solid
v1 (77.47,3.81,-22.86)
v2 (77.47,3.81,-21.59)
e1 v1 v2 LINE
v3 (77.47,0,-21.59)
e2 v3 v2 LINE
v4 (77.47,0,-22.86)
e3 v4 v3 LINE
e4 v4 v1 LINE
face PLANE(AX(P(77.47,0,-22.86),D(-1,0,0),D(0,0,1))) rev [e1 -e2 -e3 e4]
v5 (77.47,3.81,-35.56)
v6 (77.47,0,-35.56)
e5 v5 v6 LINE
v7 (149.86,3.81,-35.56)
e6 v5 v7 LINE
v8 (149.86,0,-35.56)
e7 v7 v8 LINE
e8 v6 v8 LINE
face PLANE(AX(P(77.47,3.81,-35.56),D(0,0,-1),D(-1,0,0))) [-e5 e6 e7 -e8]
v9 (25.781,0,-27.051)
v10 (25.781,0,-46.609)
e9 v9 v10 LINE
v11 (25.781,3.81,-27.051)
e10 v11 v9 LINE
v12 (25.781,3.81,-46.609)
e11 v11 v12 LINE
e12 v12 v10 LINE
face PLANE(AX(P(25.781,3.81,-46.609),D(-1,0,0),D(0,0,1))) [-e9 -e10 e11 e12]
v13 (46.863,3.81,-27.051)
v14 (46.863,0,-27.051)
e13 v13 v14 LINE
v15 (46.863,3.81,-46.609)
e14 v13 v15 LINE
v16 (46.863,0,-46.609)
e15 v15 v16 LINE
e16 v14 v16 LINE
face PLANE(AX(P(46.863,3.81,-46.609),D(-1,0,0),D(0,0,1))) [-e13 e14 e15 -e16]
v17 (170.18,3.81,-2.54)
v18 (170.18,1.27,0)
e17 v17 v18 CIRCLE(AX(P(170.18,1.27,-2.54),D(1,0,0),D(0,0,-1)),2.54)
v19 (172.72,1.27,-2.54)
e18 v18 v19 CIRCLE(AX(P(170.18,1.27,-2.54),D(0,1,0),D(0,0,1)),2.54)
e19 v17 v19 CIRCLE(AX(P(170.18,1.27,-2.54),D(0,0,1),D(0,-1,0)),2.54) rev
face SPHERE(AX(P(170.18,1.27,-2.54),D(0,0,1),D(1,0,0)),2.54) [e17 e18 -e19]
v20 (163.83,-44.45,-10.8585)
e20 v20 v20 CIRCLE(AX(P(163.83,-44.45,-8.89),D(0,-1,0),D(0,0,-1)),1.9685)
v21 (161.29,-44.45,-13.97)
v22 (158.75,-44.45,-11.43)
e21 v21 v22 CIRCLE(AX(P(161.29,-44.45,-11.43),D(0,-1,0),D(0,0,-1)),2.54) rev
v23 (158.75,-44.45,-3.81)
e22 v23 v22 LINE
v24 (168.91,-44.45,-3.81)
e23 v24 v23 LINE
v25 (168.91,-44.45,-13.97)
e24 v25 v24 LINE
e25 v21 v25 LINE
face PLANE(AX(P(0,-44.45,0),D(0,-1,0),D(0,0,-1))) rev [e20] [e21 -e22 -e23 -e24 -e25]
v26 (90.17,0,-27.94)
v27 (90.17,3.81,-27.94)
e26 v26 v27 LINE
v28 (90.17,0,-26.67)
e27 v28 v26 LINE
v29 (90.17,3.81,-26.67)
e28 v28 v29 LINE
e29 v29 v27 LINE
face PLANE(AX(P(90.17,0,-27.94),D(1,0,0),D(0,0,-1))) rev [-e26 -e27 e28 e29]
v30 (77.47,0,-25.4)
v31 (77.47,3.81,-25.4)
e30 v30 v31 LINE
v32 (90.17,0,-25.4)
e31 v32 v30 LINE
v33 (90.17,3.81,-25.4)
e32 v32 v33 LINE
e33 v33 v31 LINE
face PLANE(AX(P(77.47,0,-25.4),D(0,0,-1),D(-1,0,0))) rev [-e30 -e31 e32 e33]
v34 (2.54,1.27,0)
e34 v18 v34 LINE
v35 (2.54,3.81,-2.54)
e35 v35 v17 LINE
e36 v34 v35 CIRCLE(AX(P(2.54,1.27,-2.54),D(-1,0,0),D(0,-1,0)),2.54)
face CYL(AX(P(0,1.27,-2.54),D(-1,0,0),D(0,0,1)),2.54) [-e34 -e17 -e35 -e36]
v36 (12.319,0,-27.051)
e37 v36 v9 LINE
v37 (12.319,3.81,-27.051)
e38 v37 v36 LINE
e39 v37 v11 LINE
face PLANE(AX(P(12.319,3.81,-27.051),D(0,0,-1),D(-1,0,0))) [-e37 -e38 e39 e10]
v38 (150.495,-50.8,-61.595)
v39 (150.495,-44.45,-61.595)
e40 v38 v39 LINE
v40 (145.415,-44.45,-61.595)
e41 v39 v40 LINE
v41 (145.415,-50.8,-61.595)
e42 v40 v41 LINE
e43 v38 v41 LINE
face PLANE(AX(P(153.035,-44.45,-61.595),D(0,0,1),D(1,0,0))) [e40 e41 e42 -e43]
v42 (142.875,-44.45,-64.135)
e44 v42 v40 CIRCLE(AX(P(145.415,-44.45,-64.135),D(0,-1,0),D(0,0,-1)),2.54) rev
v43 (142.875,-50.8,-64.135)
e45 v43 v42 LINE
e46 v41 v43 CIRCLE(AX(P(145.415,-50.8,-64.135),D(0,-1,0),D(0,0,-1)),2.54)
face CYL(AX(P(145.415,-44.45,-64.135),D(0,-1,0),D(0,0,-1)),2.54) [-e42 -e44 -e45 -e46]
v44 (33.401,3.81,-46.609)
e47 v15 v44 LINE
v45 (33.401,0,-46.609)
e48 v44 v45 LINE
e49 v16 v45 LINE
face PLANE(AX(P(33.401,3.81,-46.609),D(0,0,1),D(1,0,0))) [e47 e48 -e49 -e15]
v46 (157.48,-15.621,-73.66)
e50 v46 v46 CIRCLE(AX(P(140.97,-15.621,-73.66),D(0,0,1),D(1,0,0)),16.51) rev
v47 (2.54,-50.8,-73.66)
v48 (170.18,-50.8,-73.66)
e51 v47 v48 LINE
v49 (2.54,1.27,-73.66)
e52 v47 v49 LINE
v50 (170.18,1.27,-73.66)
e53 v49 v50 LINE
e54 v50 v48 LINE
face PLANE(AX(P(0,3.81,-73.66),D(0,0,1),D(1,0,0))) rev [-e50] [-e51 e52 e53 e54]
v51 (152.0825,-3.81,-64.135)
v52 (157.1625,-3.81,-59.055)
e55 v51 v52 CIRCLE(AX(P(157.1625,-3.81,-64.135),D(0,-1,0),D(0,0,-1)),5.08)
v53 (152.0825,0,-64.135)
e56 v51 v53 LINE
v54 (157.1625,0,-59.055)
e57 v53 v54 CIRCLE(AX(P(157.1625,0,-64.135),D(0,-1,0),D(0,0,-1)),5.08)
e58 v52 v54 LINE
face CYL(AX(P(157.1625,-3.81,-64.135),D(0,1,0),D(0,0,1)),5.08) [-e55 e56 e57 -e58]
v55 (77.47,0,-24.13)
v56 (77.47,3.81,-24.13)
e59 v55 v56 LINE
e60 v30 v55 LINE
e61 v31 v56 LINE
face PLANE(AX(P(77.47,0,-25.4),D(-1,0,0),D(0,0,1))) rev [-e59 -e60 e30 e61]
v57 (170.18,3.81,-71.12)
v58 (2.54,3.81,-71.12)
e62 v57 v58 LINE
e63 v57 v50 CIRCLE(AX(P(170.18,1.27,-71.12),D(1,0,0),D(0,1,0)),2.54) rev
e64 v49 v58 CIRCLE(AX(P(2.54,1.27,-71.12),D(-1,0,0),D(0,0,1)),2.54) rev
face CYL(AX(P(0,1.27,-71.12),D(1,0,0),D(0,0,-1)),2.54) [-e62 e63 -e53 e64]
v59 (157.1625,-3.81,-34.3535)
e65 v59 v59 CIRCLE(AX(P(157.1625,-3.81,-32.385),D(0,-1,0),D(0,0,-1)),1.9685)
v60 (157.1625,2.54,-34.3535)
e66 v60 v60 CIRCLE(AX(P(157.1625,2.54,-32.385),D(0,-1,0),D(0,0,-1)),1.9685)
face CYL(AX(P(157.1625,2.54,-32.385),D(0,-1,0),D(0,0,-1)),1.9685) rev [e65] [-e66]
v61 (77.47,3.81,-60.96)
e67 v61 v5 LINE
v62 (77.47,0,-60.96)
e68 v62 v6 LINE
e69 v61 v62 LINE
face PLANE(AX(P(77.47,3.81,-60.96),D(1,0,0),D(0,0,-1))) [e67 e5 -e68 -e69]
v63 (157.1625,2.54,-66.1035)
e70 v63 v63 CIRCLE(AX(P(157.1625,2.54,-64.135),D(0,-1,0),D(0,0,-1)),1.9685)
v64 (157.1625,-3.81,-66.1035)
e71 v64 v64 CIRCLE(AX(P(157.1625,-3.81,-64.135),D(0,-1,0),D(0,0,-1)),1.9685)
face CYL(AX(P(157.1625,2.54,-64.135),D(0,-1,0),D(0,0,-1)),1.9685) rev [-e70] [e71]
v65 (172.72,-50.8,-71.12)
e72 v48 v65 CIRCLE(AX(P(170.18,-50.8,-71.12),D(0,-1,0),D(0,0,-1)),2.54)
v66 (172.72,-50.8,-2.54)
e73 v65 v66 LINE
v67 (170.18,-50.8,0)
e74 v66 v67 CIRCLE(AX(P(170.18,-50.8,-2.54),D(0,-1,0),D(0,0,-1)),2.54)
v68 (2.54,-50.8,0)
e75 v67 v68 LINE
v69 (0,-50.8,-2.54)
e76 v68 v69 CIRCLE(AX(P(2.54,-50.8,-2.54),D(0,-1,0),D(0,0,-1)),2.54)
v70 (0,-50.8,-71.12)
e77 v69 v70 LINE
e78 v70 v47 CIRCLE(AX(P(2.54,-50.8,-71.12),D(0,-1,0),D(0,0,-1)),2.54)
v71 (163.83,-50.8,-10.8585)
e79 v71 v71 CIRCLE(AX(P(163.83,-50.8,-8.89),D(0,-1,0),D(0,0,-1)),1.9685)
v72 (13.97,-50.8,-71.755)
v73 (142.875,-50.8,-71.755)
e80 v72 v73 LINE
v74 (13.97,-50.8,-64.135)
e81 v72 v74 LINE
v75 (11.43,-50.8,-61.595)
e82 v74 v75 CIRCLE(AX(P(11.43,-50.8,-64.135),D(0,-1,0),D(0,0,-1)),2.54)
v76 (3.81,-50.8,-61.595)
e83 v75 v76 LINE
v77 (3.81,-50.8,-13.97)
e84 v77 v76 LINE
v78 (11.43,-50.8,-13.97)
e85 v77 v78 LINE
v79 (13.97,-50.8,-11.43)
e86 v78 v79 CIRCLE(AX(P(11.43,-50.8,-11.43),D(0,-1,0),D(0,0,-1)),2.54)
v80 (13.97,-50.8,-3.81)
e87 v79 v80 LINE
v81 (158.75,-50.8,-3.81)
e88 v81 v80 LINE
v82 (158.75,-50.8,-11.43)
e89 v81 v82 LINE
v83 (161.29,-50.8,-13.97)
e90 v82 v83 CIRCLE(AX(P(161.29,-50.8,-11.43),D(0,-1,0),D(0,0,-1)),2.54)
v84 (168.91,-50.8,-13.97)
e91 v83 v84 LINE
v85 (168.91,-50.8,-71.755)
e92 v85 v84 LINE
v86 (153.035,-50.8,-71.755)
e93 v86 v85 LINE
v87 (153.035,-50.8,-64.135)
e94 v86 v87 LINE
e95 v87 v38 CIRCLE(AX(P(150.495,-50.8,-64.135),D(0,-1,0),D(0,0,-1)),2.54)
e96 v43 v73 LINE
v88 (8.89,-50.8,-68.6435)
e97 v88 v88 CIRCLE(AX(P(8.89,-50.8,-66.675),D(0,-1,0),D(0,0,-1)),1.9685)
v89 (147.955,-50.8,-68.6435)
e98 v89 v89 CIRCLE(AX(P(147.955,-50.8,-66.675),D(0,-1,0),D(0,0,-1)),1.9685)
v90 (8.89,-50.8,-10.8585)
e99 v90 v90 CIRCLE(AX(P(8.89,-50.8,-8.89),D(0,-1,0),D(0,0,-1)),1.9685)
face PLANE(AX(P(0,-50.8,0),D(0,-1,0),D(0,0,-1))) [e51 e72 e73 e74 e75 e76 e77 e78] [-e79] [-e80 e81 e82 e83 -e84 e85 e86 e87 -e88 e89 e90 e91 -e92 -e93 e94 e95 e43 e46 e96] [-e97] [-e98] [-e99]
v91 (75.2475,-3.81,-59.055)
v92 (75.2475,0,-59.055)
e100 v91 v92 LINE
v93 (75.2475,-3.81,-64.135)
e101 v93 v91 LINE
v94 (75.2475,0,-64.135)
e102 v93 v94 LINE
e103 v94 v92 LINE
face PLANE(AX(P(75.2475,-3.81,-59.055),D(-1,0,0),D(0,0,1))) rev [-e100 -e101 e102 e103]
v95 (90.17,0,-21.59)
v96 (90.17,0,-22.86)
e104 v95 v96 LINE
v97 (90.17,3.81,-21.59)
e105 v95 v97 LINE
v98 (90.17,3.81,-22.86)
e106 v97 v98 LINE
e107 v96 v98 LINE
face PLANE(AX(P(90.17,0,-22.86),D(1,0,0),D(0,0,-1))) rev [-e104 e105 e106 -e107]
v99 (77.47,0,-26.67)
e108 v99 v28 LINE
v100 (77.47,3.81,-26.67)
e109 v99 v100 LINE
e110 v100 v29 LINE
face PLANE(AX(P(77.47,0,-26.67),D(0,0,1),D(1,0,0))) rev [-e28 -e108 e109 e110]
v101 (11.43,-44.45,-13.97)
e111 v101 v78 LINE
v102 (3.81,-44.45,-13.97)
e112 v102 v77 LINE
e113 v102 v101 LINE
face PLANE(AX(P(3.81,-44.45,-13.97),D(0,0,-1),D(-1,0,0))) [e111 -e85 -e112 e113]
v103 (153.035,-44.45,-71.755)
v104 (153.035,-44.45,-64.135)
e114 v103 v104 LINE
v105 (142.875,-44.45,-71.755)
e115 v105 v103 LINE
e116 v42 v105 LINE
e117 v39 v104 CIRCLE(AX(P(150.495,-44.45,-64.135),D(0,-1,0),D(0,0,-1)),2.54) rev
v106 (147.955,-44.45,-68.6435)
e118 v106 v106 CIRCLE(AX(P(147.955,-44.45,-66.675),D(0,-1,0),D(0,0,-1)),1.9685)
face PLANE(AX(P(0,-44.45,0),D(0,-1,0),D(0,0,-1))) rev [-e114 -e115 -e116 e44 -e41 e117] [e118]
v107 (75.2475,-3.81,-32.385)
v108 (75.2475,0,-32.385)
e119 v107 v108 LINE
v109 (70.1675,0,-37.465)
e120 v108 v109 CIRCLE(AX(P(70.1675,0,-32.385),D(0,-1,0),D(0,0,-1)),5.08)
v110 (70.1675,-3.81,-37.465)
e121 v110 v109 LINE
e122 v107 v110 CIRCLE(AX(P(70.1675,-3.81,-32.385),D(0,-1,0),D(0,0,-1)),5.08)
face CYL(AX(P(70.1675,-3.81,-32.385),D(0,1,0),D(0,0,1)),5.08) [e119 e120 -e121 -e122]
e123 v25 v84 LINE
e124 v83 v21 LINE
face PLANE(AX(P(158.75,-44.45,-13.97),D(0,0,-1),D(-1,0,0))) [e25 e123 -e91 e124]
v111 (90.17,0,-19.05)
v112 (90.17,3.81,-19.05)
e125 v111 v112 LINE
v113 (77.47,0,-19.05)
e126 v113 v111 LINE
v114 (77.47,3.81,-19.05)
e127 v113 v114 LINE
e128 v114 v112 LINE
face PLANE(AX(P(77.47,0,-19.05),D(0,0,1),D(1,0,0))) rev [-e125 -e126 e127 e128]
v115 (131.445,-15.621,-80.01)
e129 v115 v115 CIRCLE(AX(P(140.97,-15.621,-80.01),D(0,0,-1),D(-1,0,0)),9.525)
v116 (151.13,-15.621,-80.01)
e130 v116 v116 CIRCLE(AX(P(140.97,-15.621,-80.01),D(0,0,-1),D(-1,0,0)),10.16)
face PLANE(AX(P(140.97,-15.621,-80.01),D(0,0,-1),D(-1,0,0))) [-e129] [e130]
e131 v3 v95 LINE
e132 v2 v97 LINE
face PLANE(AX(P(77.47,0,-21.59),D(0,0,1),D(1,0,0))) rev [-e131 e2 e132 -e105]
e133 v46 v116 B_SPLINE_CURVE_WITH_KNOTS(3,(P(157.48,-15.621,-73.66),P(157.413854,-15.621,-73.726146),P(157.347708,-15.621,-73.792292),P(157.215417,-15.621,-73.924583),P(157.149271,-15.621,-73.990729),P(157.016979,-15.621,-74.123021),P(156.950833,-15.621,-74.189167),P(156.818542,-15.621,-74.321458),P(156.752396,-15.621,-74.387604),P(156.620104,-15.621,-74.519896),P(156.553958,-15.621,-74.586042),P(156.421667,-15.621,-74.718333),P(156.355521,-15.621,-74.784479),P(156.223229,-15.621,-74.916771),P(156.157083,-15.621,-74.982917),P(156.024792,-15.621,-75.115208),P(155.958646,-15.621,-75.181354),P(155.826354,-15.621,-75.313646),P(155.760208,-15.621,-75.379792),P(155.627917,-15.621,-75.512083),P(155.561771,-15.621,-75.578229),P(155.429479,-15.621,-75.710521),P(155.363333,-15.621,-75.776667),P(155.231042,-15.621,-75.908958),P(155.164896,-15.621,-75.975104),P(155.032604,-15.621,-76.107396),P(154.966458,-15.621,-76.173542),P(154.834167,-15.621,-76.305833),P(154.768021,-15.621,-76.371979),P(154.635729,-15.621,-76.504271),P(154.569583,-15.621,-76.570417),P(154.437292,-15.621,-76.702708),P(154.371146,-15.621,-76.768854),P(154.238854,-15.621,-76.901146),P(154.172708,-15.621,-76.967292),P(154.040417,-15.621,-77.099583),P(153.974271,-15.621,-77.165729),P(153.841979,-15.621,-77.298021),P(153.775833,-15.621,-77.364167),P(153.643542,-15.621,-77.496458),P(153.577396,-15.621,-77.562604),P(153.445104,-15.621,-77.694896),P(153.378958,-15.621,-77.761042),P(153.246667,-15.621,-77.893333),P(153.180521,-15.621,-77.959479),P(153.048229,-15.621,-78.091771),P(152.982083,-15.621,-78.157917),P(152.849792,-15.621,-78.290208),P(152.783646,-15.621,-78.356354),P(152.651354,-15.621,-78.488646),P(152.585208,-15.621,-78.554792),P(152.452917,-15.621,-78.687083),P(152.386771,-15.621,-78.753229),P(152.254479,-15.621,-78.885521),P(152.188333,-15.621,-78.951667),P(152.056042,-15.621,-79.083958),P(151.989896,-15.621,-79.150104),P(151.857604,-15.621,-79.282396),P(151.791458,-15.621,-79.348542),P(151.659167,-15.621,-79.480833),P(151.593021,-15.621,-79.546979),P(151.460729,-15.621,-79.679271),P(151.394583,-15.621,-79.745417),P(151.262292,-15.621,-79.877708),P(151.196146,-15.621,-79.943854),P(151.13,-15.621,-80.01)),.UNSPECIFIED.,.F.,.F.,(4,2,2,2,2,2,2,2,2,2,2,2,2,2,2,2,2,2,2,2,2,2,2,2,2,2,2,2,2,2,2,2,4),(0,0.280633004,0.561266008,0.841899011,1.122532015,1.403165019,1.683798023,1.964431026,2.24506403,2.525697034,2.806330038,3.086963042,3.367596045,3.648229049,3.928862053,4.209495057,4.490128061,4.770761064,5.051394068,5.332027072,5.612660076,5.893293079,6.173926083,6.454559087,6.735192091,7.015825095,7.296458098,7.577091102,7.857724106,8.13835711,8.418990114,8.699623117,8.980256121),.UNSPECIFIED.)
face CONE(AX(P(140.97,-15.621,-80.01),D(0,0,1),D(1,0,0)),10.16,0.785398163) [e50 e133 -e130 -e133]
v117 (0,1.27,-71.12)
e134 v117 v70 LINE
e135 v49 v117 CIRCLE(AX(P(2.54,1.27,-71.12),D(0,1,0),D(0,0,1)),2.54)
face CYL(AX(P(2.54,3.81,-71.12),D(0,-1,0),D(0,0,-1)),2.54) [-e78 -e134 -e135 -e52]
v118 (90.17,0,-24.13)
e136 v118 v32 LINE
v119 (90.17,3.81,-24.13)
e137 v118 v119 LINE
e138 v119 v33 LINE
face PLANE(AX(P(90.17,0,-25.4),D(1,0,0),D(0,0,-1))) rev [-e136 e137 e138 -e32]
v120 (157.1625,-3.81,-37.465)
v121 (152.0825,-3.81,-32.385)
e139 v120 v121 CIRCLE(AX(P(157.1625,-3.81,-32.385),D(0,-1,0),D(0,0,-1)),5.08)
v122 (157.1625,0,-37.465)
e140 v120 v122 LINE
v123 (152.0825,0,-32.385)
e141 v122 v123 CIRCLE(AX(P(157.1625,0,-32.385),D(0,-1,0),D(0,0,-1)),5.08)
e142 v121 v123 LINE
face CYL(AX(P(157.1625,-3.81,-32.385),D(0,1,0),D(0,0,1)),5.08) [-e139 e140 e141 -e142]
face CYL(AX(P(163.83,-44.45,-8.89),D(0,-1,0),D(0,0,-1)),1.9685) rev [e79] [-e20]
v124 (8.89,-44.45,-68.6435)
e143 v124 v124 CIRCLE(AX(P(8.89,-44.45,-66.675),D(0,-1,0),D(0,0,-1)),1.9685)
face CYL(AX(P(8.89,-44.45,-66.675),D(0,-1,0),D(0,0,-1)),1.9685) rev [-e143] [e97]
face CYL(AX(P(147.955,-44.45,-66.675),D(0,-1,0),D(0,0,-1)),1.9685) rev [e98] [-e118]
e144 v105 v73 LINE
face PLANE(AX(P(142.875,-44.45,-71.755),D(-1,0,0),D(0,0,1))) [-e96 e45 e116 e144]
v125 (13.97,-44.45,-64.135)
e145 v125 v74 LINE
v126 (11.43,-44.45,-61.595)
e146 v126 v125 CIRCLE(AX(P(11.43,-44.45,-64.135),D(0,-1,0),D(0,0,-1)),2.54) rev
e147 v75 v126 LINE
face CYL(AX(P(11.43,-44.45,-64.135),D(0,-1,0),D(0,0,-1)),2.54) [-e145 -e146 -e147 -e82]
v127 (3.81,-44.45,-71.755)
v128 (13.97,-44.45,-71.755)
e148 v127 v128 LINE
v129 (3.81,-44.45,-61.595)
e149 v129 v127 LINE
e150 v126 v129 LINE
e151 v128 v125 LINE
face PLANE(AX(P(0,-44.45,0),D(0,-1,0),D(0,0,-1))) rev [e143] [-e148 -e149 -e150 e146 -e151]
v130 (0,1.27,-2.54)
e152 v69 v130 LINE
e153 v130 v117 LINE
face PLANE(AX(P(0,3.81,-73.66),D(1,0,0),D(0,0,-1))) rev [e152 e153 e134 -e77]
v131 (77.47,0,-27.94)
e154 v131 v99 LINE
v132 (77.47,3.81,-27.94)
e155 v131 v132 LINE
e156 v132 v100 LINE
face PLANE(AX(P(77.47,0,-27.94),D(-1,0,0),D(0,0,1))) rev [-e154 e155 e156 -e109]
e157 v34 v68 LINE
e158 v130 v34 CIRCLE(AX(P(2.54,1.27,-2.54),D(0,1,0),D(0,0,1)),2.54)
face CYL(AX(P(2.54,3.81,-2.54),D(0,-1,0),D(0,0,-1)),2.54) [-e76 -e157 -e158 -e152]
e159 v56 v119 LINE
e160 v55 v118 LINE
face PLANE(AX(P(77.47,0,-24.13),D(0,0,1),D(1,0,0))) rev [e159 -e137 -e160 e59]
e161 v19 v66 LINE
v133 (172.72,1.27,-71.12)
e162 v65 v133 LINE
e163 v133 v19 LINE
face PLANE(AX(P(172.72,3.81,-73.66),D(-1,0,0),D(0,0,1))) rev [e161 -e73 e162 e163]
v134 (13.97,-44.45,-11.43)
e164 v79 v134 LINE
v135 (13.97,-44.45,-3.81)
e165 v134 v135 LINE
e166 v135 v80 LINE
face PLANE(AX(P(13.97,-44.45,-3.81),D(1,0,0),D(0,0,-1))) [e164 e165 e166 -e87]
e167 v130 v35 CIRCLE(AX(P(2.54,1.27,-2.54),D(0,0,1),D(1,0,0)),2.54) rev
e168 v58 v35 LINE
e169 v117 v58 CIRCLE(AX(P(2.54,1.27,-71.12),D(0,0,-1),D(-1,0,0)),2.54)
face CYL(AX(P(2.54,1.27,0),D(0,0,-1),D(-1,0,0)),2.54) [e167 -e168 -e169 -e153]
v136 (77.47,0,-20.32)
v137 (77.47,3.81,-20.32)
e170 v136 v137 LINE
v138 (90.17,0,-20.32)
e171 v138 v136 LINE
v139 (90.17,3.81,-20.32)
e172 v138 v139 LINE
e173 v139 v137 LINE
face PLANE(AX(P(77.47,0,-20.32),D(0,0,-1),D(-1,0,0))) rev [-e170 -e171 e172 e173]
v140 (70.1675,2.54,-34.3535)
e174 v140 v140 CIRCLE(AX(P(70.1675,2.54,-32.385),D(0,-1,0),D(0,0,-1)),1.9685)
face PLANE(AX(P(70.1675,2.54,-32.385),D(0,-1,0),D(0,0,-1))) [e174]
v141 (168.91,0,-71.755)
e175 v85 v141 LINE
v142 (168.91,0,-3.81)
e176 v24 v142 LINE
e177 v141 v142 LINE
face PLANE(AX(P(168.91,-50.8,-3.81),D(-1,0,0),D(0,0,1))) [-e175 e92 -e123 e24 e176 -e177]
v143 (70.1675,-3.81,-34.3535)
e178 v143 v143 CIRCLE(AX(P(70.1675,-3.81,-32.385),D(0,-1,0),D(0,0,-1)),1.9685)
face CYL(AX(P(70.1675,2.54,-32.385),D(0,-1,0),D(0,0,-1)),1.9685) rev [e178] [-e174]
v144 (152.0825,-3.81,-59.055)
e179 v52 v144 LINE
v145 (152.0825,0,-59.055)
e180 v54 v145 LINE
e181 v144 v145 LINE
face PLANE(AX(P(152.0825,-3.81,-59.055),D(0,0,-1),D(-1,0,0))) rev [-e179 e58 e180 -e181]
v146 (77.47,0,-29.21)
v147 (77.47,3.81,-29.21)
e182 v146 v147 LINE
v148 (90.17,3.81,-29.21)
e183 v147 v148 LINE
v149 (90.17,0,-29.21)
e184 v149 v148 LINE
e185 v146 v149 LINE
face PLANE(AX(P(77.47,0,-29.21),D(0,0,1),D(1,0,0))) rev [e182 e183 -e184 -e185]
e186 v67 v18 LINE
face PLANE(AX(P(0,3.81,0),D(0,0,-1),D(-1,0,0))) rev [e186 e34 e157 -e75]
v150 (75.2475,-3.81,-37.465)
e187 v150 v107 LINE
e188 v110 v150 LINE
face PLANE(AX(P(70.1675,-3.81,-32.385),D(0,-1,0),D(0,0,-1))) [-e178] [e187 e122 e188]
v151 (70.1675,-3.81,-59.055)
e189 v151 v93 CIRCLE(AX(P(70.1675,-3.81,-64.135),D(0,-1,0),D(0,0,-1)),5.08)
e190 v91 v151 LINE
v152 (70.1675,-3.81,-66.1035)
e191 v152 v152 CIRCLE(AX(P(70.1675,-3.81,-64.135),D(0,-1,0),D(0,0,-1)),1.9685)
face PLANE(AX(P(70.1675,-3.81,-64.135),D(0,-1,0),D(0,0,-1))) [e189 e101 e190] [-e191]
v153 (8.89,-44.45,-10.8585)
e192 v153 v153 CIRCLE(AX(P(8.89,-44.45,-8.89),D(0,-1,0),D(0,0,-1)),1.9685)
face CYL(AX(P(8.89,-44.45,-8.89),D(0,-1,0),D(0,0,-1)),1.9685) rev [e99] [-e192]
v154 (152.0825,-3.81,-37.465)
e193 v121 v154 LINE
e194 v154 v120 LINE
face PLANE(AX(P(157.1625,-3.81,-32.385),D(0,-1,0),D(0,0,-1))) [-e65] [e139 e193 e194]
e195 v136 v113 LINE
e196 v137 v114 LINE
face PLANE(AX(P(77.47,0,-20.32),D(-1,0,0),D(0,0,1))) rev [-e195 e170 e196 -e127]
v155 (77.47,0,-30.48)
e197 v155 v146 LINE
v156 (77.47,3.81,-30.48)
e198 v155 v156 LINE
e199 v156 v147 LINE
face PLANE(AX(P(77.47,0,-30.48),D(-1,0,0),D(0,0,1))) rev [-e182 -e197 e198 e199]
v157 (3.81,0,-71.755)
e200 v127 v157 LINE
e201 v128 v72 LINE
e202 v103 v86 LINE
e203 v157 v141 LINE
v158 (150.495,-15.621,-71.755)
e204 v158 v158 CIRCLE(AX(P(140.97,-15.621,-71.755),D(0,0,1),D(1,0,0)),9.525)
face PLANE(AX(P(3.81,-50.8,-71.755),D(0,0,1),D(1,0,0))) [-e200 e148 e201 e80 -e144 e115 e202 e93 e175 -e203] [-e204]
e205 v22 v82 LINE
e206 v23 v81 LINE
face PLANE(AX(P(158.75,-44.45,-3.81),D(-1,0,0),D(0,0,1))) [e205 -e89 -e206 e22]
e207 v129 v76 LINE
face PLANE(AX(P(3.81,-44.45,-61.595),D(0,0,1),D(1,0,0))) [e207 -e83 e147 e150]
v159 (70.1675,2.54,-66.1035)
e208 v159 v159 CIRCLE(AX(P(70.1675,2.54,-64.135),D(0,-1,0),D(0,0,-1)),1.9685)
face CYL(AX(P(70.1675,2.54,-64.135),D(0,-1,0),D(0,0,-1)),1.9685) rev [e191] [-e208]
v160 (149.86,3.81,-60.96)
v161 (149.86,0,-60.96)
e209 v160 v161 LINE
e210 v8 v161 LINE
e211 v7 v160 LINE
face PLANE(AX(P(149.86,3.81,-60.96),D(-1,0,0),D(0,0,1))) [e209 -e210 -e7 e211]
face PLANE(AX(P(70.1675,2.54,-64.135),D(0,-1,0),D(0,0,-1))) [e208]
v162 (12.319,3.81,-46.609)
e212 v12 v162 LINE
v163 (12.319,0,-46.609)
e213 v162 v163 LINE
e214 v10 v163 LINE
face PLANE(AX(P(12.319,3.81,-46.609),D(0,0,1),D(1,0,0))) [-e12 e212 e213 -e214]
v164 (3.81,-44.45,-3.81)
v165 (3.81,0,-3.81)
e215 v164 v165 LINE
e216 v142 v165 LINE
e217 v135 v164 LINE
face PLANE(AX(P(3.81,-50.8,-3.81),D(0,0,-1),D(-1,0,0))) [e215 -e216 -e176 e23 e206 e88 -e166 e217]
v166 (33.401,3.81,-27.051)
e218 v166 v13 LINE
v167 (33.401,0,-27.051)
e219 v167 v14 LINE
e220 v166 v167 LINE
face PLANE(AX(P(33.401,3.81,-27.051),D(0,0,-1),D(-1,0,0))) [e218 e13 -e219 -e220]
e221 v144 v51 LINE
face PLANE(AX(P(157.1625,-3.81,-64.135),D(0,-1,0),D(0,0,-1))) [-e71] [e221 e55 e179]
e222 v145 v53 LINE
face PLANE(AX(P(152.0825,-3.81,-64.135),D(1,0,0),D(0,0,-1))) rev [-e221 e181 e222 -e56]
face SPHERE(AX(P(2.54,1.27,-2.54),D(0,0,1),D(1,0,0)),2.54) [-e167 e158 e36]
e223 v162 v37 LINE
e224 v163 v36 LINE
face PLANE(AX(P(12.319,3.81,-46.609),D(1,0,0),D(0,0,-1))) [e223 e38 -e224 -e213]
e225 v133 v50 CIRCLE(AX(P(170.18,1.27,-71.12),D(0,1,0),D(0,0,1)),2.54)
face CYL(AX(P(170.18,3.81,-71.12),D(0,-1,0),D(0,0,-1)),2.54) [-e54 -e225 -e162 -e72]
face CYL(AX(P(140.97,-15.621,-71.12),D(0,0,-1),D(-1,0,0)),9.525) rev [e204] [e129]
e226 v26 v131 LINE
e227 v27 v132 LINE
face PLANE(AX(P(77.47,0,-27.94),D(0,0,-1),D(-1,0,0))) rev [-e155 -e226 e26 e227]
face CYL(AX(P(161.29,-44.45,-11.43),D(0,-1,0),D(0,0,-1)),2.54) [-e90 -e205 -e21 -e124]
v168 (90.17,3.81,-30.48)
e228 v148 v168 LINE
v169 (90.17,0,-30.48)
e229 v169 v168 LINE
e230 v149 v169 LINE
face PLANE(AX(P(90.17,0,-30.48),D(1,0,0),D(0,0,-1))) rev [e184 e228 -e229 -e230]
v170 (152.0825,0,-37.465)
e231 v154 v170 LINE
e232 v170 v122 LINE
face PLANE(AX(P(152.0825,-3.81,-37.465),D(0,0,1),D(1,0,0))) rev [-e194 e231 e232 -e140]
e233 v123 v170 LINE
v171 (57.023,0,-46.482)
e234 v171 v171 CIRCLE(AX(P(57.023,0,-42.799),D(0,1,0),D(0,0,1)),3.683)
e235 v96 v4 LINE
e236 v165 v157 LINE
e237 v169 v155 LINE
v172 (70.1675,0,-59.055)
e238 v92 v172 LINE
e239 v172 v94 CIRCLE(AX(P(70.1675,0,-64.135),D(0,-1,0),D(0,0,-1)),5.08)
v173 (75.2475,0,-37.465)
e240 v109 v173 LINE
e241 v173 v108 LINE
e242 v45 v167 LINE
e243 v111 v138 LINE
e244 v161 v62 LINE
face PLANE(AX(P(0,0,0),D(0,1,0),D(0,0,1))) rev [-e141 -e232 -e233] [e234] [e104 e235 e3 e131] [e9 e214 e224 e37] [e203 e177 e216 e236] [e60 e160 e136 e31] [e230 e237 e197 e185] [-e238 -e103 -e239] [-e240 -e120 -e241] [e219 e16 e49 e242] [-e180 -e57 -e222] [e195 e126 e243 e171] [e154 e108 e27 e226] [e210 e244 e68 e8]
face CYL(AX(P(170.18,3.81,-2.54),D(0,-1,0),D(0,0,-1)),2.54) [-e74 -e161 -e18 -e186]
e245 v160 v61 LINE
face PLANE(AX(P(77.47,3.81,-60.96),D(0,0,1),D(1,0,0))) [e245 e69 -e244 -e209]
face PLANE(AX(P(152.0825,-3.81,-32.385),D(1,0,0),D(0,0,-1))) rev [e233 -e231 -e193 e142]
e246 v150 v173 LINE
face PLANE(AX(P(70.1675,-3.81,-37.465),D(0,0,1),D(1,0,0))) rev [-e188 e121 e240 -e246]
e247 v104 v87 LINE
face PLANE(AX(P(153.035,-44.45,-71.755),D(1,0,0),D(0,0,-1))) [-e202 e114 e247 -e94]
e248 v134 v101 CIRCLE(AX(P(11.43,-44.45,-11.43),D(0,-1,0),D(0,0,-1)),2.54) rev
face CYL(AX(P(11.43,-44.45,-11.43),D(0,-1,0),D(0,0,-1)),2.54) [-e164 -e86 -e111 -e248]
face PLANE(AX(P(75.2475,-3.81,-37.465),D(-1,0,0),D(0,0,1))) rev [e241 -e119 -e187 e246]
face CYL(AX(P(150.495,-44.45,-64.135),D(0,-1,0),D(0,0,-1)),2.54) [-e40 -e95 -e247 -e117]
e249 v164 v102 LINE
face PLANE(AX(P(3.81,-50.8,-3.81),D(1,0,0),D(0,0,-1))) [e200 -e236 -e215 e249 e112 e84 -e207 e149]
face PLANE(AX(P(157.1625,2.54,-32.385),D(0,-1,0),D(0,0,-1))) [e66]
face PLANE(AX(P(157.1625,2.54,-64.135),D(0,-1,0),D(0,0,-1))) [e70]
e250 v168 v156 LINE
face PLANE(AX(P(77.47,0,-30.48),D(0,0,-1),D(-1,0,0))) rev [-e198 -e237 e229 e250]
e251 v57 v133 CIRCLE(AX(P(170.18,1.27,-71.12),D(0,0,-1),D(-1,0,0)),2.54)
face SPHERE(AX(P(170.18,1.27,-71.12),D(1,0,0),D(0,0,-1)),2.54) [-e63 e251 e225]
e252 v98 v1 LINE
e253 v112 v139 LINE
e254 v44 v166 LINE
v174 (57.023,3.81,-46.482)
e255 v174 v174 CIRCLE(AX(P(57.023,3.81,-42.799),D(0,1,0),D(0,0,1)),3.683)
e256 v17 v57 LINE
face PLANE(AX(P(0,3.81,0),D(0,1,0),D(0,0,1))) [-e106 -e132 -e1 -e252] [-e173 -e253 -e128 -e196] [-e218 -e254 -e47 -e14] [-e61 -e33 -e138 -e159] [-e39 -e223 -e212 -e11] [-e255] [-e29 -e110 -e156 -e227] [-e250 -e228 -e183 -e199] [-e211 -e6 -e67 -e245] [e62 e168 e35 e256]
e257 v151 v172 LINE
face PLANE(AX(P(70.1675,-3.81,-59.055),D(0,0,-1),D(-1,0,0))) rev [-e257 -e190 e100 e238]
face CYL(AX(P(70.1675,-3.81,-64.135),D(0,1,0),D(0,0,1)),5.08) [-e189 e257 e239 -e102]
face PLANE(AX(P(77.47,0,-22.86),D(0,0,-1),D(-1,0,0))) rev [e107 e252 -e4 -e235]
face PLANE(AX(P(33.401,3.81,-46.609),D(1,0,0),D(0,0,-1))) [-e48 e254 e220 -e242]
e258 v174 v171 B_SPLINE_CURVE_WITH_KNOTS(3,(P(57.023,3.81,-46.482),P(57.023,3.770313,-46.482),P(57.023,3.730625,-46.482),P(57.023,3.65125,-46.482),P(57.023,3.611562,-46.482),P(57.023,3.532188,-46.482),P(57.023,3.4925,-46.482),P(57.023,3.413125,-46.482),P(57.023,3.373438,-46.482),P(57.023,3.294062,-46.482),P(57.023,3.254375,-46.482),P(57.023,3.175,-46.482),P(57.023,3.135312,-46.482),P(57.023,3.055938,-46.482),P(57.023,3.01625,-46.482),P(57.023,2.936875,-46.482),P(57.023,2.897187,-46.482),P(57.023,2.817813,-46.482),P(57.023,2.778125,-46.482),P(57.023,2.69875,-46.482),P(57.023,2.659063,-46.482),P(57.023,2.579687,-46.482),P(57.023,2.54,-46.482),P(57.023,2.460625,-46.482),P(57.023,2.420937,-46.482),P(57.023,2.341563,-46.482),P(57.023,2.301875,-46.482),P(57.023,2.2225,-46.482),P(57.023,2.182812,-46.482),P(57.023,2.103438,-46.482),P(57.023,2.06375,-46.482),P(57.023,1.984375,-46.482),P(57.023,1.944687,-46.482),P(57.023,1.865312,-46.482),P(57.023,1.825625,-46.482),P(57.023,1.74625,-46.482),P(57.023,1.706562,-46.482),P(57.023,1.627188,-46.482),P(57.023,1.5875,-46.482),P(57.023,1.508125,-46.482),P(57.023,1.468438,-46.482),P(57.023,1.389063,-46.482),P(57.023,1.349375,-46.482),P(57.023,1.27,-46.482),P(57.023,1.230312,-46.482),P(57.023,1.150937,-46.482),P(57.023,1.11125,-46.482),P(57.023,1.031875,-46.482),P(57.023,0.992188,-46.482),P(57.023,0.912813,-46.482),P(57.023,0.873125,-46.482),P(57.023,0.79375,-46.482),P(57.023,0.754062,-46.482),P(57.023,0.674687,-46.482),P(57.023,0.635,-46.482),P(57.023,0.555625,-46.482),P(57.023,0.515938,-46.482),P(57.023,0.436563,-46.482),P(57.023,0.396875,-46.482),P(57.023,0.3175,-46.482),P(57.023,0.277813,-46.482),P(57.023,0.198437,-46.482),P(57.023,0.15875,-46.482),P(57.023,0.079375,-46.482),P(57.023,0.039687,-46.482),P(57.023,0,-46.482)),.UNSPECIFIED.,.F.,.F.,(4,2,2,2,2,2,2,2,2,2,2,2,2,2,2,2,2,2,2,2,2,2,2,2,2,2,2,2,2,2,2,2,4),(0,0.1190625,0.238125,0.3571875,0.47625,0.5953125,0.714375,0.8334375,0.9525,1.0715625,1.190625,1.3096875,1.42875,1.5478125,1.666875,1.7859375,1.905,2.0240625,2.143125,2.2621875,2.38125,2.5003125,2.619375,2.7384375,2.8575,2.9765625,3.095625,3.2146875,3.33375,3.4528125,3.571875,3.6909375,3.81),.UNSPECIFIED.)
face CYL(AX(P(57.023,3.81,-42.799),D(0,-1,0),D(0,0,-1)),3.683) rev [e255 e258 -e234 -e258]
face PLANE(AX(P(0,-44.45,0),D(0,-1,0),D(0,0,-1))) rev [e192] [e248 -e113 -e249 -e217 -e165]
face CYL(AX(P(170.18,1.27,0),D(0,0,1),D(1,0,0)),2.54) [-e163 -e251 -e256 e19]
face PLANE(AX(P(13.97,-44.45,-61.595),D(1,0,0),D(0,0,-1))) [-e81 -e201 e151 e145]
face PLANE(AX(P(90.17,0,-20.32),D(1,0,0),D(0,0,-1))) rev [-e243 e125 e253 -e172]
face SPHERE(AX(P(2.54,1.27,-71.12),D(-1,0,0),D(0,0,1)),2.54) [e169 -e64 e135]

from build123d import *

# Parameters (mm, degrees)
SKETCH1_W           = 172.72
SKETCH1_H           = 73.66
SKETCH1_R           = 3.683
SKETCH1_W_2         = 72.39
SKETCH1_H_2         = 25.4
SKETCH1_W_3         = 13.462
SKETCH1_H_3         = 19.558
BOSS_EXTRUDE1_DEPTH = 3.81
BOSS_EXTRUDE2_DEPTH = 3.81
SKETCH3_R           = 1.9685
CUT_EXTRUDE1_DEPTH  = 6.35
SKETCH4_W           = 172.72
SKETCH4_H           = 73.66
SKETCH4_W_2         = 165.1
SKETCH4_H_2         = 67.945
BOSS_EXTRUDE4_DEPTH = 50.8
FILLET1_R           = 2.54
SKETCH5_W           = 10.16
SKETCH5_H           = 10.16
BOSS_EXTRUDE5_DEPTH = 6.35
FILLET2_R           = 2.54
SKETCH6_R           = 1.9685
CUT_EXTRUDE2_DEPTH  = 6.35
SKETCH7_W           = 12.7
SKETCH7_H           = 1.27
CUT_EXTRUDE3_DEPTH  = 3.81
SKETCH8_R           = 9.525
CUT_EXTRUDE4_DEPTH  = 2.54
BOSS_EXTRUDE6_START = 6.35
SKETCH9_R           = 16.51
SKETCH9_R_2         = 9.525
BOSS_EXTRUDE6_DEPTH = 6.35
CHAMFER1_SIZE       = 6.35


with BuildPart() as part:
    # Sketch1 → Boss-Extrude1 (new body)
    with BuildSketch(Plane(origin=(0, 0, 0), x_dir=(1, 0, 0), z_dir=(0, 1, 0))):
        with Locations((86.36, 36.83)):
            Rectangle(SKETCH1_W, SKETCH1_H)
        with Locations(Location((57.023, 42.799, 0), (0, 0, 90))):
            Circle(SKETCH1_R, mode=Mode.SUBTRACT)
        with Locations((113.665, 48.26)):
            Rectangle(SKETCH1_W_2, SKETCH1_H_2, mode=Mode.SUBTRACT)
        with Locations((19.05, 36.83)):
            Rectangle(SKETCH1_W_3, SKETCH1_H_3, mode=Mode.SUBTRACT)
        with Locations((40.132, 36.83)):
            Rectangle(SKETCH1_W_3, SKETCH1_H_3, mode=Mode.SUBTRACT)
    extrude(amount=BOSS_EXTRUDE1_DEPTH)

    # Sketch2 → Boss-Extrude2 (add)
    with BuildSketch(Plane.XZ):
        with BuildLine():
            Line((70.1675, -37.465), (75.2475, -37.465))
            Line((75.2475, -37.465), (75.2475, -32.385))
            ThreePointArc((75.2475, -32.385), (66.575397552, -28.792897552), (70.1675, -37.465))
        make_face()
        with BuildLine():
            Line((70.1675, -59.055), (75.2475, -59.055))
            Line((75.2475, -59.055), (75.2475, -64.135))
            ThreePointArc((75.2475, -64.135), (66.575397552, -67.727102448), (70.1675, -59.055))
        make_face()
        with BuildLine():
            Line((152.0825, -32.385), (152.0825, -37.465))
            Line((152.0825, -37.465), (157.1625, -37.465))
            ThreePointArc((157.1625, -37.465), (160.754602448, -28.792897552), (152.0825, -32.385))
        make_face()
        with BuildLine():
            Line((152.0825, -64.135), (152.0825, -59.055))
            Line((152.0825, -59.055), (157.1625, -59.055))
            ThreePointArc((157.1625, -59.055), (160.754602448, -67.727102448), (152.0825, -64.135))
        make_face()
    extrude(amount=BOSS_EXTRUDE2_DEPTH)

    # Sketch3 → Cut-Extrude1 (cut)
    with BuildSketch(Plane.XZ.offset(3.81)):
        with Locations(Location((70.1675, -32.385, 0), (0, 0, 270))):
            Circle(SKETCH3_R)
        with Locations(Location((70.1675, -64.135, 0), (0, 0, 270))):
            Circle(SKETCH3_R)
        with Locations(Location((157.1625, -64.135, 0), (0, 0, 270))):
            Circle(SKETCH3_R)
        with Locations(Location((157.1625, -32.385, 0), (0, 0, 270))):
            Circle(SKETCH3_R)
    extrude(amount=-CUT_EXTRUDE1_DEPTH, mode=Mode.SUBTRACT)

    # Sketch4 → Boss-Extrude4 (add)
    with BuildSketch(Plane.XZ):
        with Locations((86.36, -36.83)):
            Rectangle(SKETCH4_W, SKETCH4_H)
        with Locations((86.36, -37.7825)):
            Rectangle(SKETCH4_W_2, SKETCH4_H_2, mode=Mode.SUBTRACT)
    extrude(amount=BOSS_EXTRUDE4_DEPTH)

    # Fillet1
    fillet1_edges = [part.edges().sort_by_distance(p)[0] for p in [
        (172.72, 3.81, -36.83),
        (86.36, 3.81, -73.66),
        (0, 3.81, -36.83),
        (0, -23.495, -73.66),
        (172.72, -23.495, -73.66),
        (172.72, -23.495, 0),
        (0, -23.495, 0),
        (86.36, 3.81, 0),
    ]]
    fillet(fillet1_edges, radius=FILLET1_R)

    # Sketch5 → Boss-Extrude5 (add)
    with BuildSketch(Plane.XZ.offset(50.8)):
        with Locations((8.89, -8.89)):
            Rectangle(SKETCH5_W, SKETCH5_H)
        with Locations((8.89, -66.675)):
            Rectangle(SKETCH5_W, SKETCH5_H)
        with Locations((163.83, -8.89)):
            Rectangle(SKETCH5_W, SKETCH5_H)
        with Locations((147.955, -66.675)):
            Rectangle(SKETCH5_W, SKETCH5_H)
    extrude(amount=-BOSS_EXTRUDE5_DEPTH)

    # Fillet2
    fillet2_edges = [part.edges().sort_by_distance(p)[0] for p in [
        (13.97, -47.625, -13.97),
        (13.97, -47.625, -61.595),
        (153.035, -47.625, -61.595),
        (142.875, -47.625, -61.595),
        (158.75, -47.625, -13.97),
    ]]
    fillet(fillet2_edges, radius=FILLET2_R)

    # Sketch6 → Cut-Extrude2 (cut)
    with BuildSketch(Plane.XZ.offset(50.8)):
        with Locations(Location((8.89, -66.675, 0), (0, 0, 270))):
            Circle(SKETCH6_R)
        with Locations(Location((8.89, -8.89, 0), (0, 0, 270))):
            Circle(SKETCH6_R)
        with Locations(Location((163.83, -8.89, 0), (0, 0, 270))):
            Circle(SKETCH6_R)
        with Locations(Location((147.955, -66.675, 0), (0, 0, 270))):
            Circle(SKETCH6_R)
    extrude(amount=-CUT_EXTRUDE2_DEPTH, mode=Mode.SUBTRACT)

    # Sketch7 → Cut-Extrude3 (cut)
    with BuildSketch(Plane(origin=(0, 3.81, 0), x_dir=(1, 0, 0), z_dir=(0, 1, 0))):
        with Locations((83.82, 29.845)):
            Rectangle(SKETCH7_W, SKETCH7_H)
        with Locations((83.82, 27.305)):
            Rectangle(SKETCH7_W, SKETCH7_H)
        with Locations((83.82, 24.765)):
            Rectangle(SKETCH7_W, SKETCH7_H)
        with Locations((83.82, 22.225)):
            Rectangle(SKETCH7_W, SKETCH7_H)
        with Locations((83.82, 19.685)):
            Rectangle(SKETCH7_W, SKETCH7_H)
    extrude(amount=-CUT_EXTRUDE3_DEPTH, mode=Mode.SUBTRACT)

    # Sketch8 → Cut-Extrude4 (cut)
    with BuildSketch(Plane(origin=(0, 0, -73.66), x_dir=(-1, 0, 0), z_dir=(0, 0, -1))):
        with Locations((-140.97, -15.621)):
            Circle(SKETCH8_R)
    extrude(amount=-CUT_EXTRUDE4_DEPTH, mode=Mode.SUBTRACT)

    # Sketch9 → Boss-Extrude6 (add)
    with BuildSketch(Plane(origin=(0, 0, -73.66), x_dir=(-1, 0, 0), z_dir=(0, 0, -1)).offset(BOSS_EXTRUDE6_START)):
        with Locations(Location((-140.97, -15.621, 0), (0, 0, 180))):
            Circle(SKETCH9_R)
        with Locations((-140.97, -15.621)):
            Circle(SKETCH9_R_2, mode=Mode.SUBTRACT)
    extrude(amount=-BOSS_EXTRUDE6_DEPTH)

    # Chamfer1
    chamfer1_edges = [part.edges().sort_by_distance(p)[0] for p in [
        (124.46, -15.621, -80.01),
    ]]
    chamfer(chamfer1_edges, length=CHAMFER1_SIZE - 0.0001)  # a hair under: the kernel refuses the full size


solid = part.part
